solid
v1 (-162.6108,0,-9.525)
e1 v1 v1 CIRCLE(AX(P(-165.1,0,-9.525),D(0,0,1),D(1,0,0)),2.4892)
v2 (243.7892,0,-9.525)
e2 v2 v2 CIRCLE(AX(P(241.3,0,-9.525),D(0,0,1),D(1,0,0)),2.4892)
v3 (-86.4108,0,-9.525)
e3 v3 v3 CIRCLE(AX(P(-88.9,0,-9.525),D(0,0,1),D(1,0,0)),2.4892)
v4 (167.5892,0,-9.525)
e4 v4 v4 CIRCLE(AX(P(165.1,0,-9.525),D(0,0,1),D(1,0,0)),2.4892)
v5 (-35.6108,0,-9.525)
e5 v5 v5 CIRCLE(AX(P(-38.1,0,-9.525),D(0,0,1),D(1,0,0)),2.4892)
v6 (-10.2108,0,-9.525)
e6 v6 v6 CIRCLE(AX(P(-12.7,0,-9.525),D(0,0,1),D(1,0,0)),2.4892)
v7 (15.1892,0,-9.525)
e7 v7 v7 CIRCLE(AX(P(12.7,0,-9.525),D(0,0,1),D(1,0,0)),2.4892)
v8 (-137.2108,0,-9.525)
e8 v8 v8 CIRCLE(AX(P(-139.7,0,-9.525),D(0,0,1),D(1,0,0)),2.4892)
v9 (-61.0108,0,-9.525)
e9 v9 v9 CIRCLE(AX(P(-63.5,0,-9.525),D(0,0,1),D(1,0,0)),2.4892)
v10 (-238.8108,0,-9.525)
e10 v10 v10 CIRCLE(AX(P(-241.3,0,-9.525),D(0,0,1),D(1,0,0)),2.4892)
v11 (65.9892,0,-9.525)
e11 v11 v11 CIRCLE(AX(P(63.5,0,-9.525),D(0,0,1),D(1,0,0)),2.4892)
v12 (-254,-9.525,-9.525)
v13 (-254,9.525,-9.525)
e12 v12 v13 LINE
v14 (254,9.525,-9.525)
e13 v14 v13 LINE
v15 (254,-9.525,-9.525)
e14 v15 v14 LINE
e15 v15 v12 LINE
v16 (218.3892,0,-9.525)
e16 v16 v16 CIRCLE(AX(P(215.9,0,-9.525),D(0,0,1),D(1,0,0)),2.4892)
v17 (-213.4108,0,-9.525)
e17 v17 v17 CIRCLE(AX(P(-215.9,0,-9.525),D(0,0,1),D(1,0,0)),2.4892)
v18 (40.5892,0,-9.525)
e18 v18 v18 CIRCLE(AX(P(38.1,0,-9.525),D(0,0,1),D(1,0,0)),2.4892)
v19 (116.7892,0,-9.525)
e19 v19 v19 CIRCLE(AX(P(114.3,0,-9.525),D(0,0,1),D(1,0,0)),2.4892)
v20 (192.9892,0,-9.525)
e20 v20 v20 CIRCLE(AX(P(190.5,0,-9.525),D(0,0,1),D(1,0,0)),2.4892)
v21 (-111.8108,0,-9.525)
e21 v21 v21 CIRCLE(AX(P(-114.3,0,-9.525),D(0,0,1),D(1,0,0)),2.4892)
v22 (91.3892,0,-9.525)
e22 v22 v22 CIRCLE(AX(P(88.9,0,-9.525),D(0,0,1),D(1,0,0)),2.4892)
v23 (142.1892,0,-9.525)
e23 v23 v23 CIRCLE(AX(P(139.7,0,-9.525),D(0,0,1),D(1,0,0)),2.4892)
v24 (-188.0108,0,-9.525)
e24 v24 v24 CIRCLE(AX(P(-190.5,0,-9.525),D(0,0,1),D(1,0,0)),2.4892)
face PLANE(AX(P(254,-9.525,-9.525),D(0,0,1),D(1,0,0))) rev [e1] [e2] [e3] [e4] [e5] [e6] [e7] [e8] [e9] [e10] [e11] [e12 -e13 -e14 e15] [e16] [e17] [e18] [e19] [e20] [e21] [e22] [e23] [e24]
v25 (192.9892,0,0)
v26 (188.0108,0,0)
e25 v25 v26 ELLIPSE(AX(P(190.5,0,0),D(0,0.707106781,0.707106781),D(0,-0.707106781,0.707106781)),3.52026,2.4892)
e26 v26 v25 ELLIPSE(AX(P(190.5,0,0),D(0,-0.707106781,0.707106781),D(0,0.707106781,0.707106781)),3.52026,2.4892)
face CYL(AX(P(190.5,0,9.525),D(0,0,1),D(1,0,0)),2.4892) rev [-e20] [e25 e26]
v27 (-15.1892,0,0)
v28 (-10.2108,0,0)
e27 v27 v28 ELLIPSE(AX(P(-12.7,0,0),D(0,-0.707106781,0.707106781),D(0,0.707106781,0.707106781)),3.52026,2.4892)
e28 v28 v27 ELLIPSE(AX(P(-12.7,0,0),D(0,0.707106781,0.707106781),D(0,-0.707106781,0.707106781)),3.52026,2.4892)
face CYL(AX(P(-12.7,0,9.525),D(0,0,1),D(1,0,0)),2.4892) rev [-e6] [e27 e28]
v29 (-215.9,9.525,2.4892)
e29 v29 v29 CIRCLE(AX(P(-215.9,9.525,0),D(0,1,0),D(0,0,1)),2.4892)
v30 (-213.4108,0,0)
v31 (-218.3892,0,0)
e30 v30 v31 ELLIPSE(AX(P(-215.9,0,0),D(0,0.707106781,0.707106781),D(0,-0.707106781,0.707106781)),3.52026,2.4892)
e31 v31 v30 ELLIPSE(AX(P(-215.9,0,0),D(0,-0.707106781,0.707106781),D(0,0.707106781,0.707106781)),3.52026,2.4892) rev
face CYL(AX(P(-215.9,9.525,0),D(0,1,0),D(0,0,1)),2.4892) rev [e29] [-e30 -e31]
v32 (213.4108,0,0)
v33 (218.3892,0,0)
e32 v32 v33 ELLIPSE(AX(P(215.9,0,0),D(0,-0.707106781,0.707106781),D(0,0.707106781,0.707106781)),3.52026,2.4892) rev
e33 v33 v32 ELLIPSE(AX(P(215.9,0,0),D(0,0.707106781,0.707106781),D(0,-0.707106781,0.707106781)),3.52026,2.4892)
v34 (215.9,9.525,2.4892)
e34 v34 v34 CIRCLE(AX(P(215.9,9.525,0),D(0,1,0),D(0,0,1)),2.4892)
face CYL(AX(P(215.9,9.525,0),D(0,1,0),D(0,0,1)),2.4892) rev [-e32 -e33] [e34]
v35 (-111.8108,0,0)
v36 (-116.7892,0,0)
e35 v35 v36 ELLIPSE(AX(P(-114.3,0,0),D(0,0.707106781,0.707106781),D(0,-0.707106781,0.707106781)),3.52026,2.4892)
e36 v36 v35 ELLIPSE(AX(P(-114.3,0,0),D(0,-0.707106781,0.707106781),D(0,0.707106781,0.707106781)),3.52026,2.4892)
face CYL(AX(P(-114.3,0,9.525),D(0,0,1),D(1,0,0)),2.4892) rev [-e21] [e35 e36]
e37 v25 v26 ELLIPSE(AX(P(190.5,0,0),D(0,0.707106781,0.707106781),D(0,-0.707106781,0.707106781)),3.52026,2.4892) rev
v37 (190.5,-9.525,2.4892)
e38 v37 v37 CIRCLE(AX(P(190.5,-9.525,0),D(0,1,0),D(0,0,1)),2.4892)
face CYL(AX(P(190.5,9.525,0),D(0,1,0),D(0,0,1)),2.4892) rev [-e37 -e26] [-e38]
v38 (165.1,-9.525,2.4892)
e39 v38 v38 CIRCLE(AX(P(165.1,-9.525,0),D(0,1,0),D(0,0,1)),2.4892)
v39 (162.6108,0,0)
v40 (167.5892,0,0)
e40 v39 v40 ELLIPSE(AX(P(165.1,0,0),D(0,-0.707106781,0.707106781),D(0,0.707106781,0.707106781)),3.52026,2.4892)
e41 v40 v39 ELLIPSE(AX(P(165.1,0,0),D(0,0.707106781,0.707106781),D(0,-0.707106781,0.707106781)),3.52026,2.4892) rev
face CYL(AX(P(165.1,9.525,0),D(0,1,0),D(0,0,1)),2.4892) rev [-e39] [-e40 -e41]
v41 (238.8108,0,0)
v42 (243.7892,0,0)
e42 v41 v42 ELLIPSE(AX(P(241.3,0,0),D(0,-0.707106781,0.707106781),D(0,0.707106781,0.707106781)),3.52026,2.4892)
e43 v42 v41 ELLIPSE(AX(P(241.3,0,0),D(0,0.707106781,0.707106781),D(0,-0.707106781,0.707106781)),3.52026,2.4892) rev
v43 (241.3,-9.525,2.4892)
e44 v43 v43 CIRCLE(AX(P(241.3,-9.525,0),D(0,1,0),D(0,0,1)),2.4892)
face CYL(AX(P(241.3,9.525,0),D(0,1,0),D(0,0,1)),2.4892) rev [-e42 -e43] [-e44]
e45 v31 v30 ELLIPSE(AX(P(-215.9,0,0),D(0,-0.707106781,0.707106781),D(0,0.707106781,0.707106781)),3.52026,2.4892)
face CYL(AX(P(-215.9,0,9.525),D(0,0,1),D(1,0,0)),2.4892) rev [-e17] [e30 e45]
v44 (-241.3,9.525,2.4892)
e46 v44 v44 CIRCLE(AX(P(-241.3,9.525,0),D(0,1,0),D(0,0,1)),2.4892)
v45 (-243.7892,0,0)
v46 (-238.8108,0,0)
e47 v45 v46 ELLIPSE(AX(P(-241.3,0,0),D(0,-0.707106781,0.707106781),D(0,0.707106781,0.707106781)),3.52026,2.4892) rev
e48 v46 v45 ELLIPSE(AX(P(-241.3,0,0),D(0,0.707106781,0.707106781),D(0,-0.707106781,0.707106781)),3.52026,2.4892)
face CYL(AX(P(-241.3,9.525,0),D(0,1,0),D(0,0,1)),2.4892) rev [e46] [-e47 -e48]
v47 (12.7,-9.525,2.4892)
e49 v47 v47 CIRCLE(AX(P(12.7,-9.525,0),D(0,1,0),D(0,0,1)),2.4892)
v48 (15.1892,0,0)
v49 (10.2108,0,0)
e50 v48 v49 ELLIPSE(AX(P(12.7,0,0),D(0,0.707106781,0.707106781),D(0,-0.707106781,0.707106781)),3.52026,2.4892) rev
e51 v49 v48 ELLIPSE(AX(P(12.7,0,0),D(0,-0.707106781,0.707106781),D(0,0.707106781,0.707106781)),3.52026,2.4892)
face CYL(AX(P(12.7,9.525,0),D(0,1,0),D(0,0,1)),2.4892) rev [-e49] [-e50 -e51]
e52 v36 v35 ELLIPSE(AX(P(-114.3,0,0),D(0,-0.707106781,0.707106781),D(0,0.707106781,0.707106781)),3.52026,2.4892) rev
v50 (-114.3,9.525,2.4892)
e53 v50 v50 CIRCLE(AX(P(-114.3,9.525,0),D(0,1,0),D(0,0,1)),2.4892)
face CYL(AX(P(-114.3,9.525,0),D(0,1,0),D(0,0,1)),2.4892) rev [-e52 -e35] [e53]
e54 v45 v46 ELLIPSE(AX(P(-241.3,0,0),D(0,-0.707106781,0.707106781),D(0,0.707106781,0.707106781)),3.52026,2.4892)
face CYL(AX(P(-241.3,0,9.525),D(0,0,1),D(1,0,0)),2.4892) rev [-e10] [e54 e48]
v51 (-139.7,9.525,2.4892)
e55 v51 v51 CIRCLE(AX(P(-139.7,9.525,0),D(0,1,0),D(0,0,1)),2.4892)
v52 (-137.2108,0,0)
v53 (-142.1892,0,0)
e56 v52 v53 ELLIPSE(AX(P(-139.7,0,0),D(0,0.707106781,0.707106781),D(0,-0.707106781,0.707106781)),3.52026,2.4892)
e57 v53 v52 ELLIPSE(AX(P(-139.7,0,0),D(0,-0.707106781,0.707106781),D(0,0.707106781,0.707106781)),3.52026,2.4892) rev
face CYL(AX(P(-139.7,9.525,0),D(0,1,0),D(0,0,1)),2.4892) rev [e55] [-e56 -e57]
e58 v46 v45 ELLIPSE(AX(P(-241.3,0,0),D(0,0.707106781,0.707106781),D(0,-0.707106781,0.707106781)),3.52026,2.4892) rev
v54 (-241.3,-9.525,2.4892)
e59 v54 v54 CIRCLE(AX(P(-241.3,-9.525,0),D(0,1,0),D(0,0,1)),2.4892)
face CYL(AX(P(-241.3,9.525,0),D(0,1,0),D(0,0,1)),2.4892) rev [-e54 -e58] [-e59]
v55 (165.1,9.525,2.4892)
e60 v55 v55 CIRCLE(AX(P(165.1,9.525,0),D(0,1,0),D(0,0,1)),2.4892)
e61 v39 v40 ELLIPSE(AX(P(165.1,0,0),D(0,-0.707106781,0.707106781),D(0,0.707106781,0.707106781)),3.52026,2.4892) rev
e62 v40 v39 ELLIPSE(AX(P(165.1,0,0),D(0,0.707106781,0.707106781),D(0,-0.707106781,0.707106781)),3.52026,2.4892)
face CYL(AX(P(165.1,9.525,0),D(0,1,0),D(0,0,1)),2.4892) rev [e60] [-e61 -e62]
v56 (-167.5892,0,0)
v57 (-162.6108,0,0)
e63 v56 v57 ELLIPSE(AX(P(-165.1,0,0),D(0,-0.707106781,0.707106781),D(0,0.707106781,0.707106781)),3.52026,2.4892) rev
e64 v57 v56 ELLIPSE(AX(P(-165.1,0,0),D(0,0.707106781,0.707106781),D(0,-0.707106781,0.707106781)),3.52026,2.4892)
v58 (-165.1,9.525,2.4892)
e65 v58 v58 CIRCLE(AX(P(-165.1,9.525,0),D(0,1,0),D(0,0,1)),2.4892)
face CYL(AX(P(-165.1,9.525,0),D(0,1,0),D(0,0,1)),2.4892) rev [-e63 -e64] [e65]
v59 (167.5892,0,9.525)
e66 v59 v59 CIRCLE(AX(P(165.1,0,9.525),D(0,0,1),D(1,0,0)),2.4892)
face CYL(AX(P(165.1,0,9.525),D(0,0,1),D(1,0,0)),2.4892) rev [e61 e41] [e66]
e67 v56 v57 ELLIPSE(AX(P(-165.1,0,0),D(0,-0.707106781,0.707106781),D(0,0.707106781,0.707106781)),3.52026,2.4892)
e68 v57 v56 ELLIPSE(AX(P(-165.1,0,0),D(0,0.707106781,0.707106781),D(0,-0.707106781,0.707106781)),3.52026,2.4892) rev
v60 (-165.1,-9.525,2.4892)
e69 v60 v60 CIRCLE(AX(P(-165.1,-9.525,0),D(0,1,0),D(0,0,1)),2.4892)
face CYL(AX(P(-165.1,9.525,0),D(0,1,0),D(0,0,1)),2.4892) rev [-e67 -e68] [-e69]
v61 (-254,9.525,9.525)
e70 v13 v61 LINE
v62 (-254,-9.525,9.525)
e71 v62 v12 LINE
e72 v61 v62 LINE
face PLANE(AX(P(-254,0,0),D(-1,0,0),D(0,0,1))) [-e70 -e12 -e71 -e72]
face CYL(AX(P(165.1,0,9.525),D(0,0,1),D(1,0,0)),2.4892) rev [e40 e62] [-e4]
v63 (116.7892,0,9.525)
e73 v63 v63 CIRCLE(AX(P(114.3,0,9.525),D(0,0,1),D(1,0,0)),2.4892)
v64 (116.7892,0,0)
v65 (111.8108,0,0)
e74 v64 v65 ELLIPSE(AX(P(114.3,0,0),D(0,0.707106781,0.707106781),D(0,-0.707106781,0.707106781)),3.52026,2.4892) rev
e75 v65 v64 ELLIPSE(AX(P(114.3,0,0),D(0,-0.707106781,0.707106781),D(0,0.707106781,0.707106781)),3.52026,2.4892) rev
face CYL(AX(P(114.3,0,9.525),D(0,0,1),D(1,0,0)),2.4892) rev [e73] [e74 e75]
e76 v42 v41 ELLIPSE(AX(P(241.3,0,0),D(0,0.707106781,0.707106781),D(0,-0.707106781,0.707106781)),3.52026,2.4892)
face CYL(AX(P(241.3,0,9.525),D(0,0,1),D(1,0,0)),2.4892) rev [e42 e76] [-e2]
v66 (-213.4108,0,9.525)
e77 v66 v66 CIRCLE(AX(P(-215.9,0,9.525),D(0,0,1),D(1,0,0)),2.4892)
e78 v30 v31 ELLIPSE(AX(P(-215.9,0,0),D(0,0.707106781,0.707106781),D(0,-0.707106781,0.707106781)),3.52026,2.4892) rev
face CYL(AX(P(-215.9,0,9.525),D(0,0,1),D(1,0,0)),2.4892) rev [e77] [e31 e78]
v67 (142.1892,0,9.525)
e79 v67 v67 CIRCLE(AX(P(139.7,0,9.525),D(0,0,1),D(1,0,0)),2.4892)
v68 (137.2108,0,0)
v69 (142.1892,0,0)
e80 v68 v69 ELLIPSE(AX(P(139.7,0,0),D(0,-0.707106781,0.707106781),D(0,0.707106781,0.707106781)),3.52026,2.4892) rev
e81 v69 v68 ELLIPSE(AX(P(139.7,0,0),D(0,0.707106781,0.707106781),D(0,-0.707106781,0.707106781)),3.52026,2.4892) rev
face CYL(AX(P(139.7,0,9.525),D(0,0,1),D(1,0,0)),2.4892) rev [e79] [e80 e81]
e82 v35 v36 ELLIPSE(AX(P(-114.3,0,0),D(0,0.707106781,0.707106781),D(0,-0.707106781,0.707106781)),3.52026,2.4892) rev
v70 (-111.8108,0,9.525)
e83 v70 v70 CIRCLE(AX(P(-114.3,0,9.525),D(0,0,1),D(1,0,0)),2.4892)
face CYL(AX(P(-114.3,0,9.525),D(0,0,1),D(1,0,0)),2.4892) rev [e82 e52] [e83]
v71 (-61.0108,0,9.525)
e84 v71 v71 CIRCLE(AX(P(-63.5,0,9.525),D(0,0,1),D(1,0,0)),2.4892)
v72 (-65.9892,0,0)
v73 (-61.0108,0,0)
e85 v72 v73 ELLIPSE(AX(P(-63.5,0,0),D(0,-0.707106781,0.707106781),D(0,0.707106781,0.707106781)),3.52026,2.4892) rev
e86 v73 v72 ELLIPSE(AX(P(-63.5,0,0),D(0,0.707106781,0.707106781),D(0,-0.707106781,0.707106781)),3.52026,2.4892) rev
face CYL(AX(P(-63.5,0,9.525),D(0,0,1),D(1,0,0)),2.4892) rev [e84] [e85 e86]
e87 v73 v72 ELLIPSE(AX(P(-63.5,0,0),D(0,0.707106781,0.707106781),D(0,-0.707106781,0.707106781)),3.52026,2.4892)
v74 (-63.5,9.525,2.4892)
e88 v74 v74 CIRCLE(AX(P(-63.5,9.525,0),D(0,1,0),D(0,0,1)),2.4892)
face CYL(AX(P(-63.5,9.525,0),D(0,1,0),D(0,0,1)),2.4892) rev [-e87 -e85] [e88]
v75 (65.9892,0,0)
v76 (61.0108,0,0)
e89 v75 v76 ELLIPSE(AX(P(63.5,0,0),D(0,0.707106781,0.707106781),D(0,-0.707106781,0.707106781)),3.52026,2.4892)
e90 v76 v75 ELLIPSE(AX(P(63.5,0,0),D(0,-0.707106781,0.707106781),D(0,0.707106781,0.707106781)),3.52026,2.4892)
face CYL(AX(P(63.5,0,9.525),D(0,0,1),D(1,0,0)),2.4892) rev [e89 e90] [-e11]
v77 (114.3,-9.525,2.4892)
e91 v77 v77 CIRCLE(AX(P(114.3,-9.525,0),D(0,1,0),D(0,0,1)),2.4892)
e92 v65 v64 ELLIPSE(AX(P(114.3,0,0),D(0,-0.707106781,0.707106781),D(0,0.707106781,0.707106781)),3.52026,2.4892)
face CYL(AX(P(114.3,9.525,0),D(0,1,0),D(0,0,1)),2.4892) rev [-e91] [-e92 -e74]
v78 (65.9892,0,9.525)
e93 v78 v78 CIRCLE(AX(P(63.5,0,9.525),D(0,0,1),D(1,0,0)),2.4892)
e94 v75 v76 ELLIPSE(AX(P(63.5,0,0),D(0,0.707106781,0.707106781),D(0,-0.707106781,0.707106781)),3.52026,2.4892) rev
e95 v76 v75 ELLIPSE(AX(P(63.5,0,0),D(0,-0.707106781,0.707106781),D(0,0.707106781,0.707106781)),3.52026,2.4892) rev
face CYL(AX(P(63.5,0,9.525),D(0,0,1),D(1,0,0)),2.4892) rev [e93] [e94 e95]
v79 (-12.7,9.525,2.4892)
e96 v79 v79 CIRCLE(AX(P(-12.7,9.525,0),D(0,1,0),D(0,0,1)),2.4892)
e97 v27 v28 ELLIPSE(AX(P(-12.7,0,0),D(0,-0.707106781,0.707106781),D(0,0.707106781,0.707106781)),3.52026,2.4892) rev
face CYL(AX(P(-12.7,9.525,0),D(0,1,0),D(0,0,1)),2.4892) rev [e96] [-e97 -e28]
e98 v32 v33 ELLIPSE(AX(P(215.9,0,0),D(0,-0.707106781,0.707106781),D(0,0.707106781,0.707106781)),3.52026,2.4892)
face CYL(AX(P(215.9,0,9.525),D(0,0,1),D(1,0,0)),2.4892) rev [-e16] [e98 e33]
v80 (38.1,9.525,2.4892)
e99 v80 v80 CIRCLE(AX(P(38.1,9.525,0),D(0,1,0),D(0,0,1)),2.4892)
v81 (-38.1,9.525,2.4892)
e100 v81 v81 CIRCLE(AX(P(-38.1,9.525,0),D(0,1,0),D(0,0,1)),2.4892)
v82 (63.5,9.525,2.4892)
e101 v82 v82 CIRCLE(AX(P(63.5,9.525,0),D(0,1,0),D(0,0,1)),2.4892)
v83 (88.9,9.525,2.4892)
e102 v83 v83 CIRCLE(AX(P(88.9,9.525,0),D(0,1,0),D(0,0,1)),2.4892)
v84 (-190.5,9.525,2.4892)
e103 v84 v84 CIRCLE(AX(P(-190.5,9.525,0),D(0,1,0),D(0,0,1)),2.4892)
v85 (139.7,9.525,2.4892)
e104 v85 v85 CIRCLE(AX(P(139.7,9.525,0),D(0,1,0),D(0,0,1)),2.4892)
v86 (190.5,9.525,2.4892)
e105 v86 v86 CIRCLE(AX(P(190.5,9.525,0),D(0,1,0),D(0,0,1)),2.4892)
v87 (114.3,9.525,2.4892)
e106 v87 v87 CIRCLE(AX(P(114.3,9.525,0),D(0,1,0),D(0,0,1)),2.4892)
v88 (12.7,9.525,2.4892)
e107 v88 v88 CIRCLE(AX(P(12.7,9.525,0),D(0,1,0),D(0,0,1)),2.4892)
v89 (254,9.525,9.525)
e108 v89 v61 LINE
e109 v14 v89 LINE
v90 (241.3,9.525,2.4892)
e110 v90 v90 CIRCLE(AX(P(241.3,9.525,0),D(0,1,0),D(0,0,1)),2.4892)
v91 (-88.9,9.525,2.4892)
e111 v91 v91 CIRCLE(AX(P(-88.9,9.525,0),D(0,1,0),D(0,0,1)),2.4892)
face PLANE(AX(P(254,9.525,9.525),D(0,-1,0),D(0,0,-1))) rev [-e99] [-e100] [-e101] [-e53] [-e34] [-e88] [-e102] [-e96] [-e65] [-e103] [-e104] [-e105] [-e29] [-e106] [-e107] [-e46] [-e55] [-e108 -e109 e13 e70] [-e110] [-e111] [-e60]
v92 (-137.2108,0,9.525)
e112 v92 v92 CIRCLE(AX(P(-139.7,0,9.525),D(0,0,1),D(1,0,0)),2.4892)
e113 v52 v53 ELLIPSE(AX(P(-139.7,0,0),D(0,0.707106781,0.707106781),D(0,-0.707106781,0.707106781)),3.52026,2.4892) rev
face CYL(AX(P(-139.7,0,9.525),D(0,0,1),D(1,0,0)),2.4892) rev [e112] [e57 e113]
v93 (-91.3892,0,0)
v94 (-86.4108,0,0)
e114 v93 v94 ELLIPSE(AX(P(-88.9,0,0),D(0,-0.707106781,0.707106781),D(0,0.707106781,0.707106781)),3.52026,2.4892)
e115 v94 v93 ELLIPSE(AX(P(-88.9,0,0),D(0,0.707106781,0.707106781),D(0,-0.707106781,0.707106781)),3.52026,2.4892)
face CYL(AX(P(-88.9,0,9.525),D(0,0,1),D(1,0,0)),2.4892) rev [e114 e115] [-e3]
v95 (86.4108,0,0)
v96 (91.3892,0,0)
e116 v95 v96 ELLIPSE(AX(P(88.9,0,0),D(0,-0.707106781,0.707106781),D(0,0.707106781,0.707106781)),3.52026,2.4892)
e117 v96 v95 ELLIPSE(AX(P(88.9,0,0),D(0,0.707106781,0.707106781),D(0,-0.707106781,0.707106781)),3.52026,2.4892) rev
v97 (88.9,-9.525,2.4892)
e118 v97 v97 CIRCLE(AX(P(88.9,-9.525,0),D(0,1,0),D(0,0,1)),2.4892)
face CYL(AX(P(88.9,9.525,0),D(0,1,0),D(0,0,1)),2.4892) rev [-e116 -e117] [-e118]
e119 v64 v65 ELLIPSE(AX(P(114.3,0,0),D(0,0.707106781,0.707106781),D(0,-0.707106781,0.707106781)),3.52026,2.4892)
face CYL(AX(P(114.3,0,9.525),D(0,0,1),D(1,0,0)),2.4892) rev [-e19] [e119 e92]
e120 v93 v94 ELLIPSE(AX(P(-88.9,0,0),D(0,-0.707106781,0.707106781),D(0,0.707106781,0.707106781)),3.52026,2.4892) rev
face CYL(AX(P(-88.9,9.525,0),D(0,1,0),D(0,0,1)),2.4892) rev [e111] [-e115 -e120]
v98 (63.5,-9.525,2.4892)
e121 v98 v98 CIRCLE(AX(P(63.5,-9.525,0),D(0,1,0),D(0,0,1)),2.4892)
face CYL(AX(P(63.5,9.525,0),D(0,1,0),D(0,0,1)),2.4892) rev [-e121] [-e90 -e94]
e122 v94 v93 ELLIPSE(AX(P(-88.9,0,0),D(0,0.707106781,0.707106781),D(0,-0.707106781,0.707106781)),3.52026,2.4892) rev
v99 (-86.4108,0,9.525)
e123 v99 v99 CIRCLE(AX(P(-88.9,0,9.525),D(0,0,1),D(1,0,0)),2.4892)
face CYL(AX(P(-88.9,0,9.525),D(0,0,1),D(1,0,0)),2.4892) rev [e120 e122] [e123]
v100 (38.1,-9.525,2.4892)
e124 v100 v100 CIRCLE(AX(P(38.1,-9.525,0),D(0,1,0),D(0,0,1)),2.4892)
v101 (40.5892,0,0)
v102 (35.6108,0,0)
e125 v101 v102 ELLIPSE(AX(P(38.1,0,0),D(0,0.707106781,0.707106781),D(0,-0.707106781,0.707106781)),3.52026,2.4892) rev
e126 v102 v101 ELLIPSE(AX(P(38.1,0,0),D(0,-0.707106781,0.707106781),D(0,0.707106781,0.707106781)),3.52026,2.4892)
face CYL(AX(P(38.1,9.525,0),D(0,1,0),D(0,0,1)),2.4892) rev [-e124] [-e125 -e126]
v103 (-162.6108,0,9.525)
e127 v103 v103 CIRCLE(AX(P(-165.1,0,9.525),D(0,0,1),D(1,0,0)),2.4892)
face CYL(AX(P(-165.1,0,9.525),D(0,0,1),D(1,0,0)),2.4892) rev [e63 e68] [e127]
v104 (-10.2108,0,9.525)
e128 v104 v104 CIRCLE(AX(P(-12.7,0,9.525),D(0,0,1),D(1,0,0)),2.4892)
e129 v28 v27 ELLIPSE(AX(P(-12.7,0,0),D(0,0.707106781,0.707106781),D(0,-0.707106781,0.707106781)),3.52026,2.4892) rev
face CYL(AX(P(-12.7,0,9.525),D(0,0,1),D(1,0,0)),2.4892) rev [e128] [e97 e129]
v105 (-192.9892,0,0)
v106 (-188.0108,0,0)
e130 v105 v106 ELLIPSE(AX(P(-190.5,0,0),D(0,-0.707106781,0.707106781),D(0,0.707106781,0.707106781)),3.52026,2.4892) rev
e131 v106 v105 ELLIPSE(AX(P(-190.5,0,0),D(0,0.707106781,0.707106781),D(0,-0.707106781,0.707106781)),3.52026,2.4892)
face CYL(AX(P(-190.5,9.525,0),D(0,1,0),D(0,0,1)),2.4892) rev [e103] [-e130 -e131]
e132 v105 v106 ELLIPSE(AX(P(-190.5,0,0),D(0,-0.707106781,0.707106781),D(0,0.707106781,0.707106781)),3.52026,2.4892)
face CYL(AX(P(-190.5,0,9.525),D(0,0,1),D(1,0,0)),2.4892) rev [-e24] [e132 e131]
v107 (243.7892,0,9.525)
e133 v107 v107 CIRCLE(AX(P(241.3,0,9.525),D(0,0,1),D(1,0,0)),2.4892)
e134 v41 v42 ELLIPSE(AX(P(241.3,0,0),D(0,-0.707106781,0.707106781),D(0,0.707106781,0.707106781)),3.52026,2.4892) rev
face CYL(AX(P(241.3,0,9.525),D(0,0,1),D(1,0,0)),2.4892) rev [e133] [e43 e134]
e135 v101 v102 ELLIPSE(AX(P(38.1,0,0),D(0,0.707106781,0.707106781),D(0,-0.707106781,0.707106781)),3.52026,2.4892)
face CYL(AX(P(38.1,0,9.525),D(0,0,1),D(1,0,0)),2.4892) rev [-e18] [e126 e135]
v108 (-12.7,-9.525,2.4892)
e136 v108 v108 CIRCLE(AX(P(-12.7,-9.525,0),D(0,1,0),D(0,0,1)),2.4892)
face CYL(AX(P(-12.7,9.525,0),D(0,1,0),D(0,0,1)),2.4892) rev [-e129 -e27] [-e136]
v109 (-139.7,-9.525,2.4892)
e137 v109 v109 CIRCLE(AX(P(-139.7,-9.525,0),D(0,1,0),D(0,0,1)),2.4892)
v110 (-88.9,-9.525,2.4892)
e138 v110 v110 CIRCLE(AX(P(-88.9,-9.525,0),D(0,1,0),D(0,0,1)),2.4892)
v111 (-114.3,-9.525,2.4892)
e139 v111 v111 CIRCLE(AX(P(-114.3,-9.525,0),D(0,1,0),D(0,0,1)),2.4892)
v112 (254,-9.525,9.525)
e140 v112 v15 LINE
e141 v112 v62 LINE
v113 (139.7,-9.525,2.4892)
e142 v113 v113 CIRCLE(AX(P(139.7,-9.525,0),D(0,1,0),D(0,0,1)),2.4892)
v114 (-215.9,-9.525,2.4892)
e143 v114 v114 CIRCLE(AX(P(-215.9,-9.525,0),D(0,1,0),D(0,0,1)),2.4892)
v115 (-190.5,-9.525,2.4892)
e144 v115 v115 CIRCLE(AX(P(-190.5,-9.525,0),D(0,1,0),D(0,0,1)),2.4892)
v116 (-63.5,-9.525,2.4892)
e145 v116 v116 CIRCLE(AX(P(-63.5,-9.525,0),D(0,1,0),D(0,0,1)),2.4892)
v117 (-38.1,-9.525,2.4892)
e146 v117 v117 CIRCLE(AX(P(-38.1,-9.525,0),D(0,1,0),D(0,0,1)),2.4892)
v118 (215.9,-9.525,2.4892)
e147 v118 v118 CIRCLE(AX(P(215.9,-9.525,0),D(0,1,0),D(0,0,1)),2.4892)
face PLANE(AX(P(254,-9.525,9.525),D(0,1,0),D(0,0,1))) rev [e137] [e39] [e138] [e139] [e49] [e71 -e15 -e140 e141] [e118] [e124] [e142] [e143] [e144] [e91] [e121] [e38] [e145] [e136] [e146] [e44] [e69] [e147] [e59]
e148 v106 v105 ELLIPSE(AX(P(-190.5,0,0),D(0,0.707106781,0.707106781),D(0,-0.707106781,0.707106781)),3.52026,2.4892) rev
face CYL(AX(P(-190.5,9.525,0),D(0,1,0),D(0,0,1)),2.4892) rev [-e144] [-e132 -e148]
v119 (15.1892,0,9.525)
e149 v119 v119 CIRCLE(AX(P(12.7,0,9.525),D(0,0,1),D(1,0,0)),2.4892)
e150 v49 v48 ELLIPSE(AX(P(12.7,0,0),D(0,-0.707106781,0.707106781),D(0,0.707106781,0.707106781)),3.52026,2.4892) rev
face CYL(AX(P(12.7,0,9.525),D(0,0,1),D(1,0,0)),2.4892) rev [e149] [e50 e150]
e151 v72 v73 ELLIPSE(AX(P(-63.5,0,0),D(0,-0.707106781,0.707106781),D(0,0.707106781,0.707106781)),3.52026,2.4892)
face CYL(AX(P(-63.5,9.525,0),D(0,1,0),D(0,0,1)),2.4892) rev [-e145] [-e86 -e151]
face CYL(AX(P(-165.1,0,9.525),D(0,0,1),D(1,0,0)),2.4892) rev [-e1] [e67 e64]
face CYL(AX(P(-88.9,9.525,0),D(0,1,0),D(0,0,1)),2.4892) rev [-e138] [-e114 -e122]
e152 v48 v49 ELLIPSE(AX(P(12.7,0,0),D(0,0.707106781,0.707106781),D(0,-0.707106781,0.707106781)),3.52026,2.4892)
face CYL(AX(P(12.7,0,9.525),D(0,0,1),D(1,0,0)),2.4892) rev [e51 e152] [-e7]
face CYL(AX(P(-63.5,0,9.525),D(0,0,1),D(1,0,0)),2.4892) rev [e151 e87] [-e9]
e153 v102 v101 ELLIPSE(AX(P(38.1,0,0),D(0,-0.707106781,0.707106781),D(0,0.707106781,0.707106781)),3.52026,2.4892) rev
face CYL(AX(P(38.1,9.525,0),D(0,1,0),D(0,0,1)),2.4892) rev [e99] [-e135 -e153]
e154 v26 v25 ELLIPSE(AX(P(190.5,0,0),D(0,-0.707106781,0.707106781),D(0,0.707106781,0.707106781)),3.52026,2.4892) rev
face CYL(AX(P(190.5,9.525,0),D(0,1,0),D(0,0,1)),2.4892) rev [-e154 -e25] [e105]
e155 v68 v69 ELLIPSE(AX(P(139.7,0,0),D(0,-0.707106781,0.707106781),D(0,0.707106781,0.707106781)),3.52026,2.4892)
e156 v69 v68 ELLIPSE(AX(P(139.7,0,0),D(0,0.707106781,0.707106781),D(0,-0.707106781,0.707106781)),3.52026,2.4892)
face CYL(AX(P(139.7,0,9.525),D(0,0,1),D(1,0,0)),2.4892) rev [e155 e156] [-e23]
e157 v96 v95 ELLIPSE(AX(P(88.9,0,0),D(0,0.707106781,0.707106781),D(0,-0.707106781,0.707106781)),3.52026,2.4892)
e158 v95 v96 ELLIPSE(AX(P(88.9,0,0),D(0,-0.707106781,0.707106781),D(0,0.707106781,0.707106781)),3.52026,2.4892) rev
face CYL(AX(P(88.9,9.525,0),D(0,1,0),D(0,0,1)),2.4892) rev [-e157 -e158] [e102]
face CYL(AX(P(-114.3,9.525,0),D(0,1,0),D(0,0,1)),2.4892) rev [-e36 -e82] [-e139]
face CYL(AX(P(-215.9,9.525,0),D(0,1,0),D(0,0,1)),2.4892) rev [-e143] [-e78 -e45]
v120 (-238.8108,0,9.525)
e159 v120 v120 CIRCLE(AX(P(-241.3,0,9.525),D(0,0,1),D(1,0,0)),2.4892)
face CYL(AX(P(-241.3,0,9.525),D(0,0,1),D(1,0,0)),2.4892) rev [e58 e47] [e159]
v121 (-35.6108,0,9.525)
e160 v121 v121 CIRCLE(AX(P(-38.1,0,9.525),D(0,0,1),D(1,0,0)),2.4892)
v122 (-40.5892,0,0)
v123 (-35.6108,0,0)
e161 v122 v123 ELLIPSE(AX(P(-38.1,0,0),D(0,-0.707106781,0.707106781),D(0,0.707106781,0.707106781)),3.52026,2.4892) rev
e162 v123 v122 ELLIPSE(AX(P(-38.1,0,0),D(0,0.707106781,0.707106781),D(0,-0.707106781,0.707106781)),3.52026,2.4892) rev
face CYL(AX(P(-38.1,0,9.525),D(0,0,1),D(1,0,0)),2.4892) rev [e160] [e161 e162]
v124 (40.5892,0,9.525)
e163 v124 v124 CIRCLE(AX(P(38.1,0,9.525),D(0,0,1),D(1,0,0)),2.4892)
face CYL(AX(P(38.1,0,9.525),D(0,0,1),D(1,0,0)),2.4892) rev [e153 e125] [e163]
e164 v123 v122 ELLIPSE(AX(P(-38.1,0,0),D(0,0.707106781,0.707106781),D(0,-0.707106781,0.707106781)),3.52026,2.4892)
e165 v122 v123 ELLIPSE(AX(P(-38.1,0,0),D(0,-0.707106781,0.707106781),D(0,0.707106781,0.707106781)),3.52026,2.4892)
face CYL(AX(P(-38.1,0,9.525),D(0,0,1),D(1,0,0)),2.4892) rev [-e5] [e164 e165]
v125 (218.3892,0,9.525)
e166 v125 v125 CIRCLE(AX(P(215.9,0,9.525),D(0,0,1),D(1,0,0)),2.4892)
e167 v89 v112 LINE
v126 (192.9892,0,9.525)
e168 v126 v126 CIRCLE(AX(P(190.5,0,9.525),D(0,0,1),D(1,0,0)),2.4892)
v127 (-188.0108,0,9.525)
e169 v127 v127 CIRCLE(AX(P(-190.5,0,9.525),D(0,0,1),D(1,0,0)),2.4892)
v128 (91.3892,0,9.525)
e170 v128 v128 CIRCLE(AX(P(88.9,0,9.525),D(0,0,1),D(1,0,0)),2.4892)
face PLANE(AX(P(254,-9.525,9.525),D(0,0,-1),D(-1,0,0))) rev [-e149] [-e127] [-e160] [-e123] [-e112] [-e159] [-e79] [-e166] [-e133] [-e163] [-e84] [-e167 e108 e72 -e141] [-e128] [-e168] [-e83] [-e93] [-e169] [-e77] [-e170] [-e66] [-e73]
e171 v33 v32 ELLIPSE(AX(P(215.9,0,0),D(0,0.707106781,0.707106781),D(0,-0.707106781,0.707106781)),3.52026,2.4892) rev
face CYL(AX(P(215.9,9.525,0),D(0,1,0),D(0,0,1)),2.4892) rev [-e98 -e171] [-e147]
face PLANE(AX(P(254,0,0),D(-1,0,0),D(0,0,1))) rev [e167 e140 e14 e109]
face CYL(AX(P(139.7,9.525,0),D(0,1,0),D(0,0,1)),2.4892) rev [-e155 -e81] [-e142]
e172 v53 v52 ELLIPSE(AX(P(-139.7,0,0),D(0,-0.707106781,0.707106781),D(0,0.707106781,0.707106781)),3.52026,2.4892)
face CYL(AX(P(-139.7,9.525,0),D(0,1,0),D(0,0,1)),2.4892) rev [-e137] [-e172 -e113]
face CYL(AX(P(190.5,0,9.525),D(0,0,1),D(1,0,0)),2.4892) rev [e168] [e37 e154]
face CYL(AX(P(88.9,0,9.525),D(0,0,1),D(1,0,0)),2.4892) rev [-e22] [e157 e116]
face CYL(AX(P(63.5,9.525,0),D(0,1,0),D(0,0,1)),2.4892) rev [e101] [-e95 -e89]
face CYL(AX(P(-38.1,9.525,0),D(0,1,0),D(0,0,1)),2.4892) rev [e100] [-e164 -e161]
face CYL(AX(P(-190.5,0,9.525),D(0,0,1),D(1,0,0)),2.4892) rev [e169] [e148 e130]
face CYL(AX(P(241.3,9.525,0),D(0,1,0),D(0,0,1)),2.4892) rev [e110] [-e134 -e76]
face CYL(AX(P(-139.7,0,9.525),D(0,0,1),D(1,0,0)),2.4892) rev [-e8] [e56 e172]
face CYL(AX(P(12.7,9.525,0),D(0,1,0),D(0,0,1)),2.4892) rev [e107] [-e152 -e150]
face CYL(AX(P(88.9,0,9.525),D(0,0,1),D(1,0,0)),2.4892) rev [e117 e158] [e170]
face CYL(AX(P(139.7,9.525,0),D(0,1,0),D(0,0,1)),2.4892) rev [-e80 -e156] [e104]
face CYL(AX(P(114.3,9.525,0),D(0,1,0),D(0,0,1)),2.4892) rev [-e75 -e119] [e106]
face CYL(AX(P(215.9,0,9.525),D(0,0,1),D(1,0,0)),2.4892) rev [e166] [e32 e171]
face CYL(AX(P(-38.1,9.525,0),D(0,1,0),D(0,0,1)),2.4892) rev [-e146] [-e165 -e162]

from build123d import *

# Parameters (mm, degrees)
SKETCH1_W             = 19.05
SKETCH1_H             = 19.05
BOSS_EXTRUDE1_DEPTH   = 254
SKETCH3_W             = 2.4892
SKETCH3_H             = 19.05
SKETCH3_AT_POINT_2_W  = 2.4892
SKETCH3_AT_POINT_2_H  = 19.05
LPATTERN1_START       = -11
LPATTERN1_OUTLINE_R   = 2.4892
LPATTERN1_DEPTH       = 22
LPATTERN1_2_OUTLINE_R = 2.4892
LPATTERN1_2_DEPTH     = 22


with BuildPart() as part:
    # Sketch1 → Boss-Extrude1 (new, symmetric)
    with BuildSketch(Plane(origin=(0, 0, 0), x_dir=(0, 0, -1), z_dir=(1, 0, 0))):
        Rectangle(SKETCH1_W, SKETCH1_H)
    extrude(amount=BOSS_EXTRUDE1_DEPTH, both=True)

    # Sketch3 → #9 (0.196) Diameter Hole1 (revolve, cut)
    with BuildSketch(Plane(origin=(241.3, 9.525, 0), x_dir=(0, 0, 1), z_dir=(1, 0, 0))):
        with Locations((1.2446, 9.525)):
            Rectangle(SKETCH3_W, SKETCH3_H)
    revolve(axis=Axis((241.3, 15.875, 0), (0, -1, 0)), mode=Mode.SUBTRACT)

    # Sketch3 at point 2 (carried to point 2, square into its face) → #9 (0.196) Diameter Hole1 at 2 (revolve, cut)
    with BuildSketch(Plane(origin=(241.3, 0, 9.525), x_dir=(0, -1, 0), z_dir=(1, 0, 0))):
        with Locations((1.2446, 9.525)):
            Rectangle(SKETCH3_AT_POINT_2_W, SKETCH3_AT_POINT_2_H)
    revolve(axis=Axis((241.3, 0, 15.875), (0, 0, -1)), mode=Mode.SUBTRACT)

    # LPattern1: read off the stored shape, not the designer's step
    # LPattern1 outline → LPattern1 (cut)
    with BuildSketch(Plane.XY.offset(LPATTERN1_START)):
        with Locations((-241.3, 0)):
            Circle(LPATTERN1_OUTLINE_R)
        with Locations((-215.9, 0)):
            Circle(LPATTERN1_OUTLINE_R)
        with Locations((-190.5, 0)):
            Circle(LPATTERN1_OUTLINE_R)
        with Locations((-165.1, 0)):
            Circle(LPATTERN1_OUTLINE_R)
        with Locations((-139.7, 0)):
            Circle(LPATTERN1_OUTLINE_R)
        with Locations((-114.3, 0)):
            Circle(LPATTERN1_OUTLINE_R)
        with Locations((-88.9, 0)):
            Circle(LPATTERN1_OUTLINE_R)
        with Locations((-63.5, 0)):
            Circle(LPATTERN1_OUTLINE_R)
        with Locations((-38.1, 0)):
            Circle(LPATTERN1_OUTLINE_R)
        with Locations((-12.7, 0)):
            Circle(LPATTERN1_OUTLINE_R)
        with Locations((12.7, 0)):
            Circle(LPATTERN1_OUTLINE_R)
        with Locations((38.1, 0)):
            Circle(LPATTERN1_OUTLINE_R)
        with Locations((63.5, 0)):
            Circle(LPATTERN1_OUTLINE_R)
        with Locations((88.9, 0)):
            Circle(LPATTERN1_OUTLINE_R)
        with Locations((114.3, 0)):
            Circle(LPATTERN1_OUTLINE_R)
        with Locations((139.7, 0)):
            Circle(LPATTERN1_OUTLINE_R)
        with Locations((165.1, 0)):
            Circle(LPATTERN1_OUTLINE_R)
        with Locations((190.5, 0)):
            Circle(LPATTERN1_OUTLINE_R)
        with Locations((215.9, 0)):
            Circle(LPATTERN1_OUTLINE_R)
    extrude(amount=LPATTERN1_DEPTH, mode=Mode.SUBTRACT)

    # LPattern1 2 outline → LPattern1 2 (cut)
    with BuildSketch(Plane(origin=(0, 0, 0), x_dir=(1, 0, 0), z_dir=(0, 1, 0)).offset(LPATTERN1_START)):
        with Locations((215.9, 0)):
            Circle(LPATTERN1_2_OUTLINE_R)
        with Locations((190.5, 0)):
            Circle(LPATTERN1_2_OUTLINE_R)
        with Locations((165.1, 0)):
            Circle(LPATTERN1_2_OUTLINE_R)
        with Locations((139.7, 0)):
            Circle(LPATTERN1_2_OUTLINE_R)
        with Locations((114.3, 0)):
            Circle(LPATTERN1_2_OUTLINE_R)
        with Locations((88.9, 0)):
            Circle(LPATTERN1_2_OUTLINE_R)
        with Locations((63.5, 0)):
            Circle(LPATTERN1_2_OUTLINE_R)
        with Locations((38.1, 0)):
            Circle(LPATTERN1_2_OUTLINE_R)
        with Locations((12.7, 0)):
            Circle(LPATTERN1_2_OUTLINE_R)
        with Locations((-12.7, 0)):
            Circle(LPATTERN1_2_OUTLINE_R)
        with Locations((-38.1, 0)):
            Circle(LPATTERN1_2_OUTLINE_R)
        with Locations((-63.5, 0)):
            Circle(LPATTERN1_2_OUTLINE_R)
        with Locations((-88.9, 0)):
            Circle(LPATTERN1_2_OUTLINE_R)
        with Locations((-114.3, 0)):
            Circle(LPATTERN1_2_OUTLINE_R)
        with Locations((-139.7, 0)):
            Circle(LPATTERN1_2_OUTLINE_R)
        with Locations((-165.1, 0)):
            Circle(LPATTERN1_2_OUTLINE_R)
        with Locations((-190.5, 0)):
            Circle(LPATTERN1_2_OUTLINE_R)
        with Locations((-215.9, 0)):
            Circle(LPATTERN1_2_OUTLINE_R)
        with Locations((-241.3, 0)):
            Circle(LPATTERN1_2_OUTLINE_R)
    extrude(amount=LPATTERN1_2_DEPTH, mode=Mode.SUBTRACT)


solid = part.part
